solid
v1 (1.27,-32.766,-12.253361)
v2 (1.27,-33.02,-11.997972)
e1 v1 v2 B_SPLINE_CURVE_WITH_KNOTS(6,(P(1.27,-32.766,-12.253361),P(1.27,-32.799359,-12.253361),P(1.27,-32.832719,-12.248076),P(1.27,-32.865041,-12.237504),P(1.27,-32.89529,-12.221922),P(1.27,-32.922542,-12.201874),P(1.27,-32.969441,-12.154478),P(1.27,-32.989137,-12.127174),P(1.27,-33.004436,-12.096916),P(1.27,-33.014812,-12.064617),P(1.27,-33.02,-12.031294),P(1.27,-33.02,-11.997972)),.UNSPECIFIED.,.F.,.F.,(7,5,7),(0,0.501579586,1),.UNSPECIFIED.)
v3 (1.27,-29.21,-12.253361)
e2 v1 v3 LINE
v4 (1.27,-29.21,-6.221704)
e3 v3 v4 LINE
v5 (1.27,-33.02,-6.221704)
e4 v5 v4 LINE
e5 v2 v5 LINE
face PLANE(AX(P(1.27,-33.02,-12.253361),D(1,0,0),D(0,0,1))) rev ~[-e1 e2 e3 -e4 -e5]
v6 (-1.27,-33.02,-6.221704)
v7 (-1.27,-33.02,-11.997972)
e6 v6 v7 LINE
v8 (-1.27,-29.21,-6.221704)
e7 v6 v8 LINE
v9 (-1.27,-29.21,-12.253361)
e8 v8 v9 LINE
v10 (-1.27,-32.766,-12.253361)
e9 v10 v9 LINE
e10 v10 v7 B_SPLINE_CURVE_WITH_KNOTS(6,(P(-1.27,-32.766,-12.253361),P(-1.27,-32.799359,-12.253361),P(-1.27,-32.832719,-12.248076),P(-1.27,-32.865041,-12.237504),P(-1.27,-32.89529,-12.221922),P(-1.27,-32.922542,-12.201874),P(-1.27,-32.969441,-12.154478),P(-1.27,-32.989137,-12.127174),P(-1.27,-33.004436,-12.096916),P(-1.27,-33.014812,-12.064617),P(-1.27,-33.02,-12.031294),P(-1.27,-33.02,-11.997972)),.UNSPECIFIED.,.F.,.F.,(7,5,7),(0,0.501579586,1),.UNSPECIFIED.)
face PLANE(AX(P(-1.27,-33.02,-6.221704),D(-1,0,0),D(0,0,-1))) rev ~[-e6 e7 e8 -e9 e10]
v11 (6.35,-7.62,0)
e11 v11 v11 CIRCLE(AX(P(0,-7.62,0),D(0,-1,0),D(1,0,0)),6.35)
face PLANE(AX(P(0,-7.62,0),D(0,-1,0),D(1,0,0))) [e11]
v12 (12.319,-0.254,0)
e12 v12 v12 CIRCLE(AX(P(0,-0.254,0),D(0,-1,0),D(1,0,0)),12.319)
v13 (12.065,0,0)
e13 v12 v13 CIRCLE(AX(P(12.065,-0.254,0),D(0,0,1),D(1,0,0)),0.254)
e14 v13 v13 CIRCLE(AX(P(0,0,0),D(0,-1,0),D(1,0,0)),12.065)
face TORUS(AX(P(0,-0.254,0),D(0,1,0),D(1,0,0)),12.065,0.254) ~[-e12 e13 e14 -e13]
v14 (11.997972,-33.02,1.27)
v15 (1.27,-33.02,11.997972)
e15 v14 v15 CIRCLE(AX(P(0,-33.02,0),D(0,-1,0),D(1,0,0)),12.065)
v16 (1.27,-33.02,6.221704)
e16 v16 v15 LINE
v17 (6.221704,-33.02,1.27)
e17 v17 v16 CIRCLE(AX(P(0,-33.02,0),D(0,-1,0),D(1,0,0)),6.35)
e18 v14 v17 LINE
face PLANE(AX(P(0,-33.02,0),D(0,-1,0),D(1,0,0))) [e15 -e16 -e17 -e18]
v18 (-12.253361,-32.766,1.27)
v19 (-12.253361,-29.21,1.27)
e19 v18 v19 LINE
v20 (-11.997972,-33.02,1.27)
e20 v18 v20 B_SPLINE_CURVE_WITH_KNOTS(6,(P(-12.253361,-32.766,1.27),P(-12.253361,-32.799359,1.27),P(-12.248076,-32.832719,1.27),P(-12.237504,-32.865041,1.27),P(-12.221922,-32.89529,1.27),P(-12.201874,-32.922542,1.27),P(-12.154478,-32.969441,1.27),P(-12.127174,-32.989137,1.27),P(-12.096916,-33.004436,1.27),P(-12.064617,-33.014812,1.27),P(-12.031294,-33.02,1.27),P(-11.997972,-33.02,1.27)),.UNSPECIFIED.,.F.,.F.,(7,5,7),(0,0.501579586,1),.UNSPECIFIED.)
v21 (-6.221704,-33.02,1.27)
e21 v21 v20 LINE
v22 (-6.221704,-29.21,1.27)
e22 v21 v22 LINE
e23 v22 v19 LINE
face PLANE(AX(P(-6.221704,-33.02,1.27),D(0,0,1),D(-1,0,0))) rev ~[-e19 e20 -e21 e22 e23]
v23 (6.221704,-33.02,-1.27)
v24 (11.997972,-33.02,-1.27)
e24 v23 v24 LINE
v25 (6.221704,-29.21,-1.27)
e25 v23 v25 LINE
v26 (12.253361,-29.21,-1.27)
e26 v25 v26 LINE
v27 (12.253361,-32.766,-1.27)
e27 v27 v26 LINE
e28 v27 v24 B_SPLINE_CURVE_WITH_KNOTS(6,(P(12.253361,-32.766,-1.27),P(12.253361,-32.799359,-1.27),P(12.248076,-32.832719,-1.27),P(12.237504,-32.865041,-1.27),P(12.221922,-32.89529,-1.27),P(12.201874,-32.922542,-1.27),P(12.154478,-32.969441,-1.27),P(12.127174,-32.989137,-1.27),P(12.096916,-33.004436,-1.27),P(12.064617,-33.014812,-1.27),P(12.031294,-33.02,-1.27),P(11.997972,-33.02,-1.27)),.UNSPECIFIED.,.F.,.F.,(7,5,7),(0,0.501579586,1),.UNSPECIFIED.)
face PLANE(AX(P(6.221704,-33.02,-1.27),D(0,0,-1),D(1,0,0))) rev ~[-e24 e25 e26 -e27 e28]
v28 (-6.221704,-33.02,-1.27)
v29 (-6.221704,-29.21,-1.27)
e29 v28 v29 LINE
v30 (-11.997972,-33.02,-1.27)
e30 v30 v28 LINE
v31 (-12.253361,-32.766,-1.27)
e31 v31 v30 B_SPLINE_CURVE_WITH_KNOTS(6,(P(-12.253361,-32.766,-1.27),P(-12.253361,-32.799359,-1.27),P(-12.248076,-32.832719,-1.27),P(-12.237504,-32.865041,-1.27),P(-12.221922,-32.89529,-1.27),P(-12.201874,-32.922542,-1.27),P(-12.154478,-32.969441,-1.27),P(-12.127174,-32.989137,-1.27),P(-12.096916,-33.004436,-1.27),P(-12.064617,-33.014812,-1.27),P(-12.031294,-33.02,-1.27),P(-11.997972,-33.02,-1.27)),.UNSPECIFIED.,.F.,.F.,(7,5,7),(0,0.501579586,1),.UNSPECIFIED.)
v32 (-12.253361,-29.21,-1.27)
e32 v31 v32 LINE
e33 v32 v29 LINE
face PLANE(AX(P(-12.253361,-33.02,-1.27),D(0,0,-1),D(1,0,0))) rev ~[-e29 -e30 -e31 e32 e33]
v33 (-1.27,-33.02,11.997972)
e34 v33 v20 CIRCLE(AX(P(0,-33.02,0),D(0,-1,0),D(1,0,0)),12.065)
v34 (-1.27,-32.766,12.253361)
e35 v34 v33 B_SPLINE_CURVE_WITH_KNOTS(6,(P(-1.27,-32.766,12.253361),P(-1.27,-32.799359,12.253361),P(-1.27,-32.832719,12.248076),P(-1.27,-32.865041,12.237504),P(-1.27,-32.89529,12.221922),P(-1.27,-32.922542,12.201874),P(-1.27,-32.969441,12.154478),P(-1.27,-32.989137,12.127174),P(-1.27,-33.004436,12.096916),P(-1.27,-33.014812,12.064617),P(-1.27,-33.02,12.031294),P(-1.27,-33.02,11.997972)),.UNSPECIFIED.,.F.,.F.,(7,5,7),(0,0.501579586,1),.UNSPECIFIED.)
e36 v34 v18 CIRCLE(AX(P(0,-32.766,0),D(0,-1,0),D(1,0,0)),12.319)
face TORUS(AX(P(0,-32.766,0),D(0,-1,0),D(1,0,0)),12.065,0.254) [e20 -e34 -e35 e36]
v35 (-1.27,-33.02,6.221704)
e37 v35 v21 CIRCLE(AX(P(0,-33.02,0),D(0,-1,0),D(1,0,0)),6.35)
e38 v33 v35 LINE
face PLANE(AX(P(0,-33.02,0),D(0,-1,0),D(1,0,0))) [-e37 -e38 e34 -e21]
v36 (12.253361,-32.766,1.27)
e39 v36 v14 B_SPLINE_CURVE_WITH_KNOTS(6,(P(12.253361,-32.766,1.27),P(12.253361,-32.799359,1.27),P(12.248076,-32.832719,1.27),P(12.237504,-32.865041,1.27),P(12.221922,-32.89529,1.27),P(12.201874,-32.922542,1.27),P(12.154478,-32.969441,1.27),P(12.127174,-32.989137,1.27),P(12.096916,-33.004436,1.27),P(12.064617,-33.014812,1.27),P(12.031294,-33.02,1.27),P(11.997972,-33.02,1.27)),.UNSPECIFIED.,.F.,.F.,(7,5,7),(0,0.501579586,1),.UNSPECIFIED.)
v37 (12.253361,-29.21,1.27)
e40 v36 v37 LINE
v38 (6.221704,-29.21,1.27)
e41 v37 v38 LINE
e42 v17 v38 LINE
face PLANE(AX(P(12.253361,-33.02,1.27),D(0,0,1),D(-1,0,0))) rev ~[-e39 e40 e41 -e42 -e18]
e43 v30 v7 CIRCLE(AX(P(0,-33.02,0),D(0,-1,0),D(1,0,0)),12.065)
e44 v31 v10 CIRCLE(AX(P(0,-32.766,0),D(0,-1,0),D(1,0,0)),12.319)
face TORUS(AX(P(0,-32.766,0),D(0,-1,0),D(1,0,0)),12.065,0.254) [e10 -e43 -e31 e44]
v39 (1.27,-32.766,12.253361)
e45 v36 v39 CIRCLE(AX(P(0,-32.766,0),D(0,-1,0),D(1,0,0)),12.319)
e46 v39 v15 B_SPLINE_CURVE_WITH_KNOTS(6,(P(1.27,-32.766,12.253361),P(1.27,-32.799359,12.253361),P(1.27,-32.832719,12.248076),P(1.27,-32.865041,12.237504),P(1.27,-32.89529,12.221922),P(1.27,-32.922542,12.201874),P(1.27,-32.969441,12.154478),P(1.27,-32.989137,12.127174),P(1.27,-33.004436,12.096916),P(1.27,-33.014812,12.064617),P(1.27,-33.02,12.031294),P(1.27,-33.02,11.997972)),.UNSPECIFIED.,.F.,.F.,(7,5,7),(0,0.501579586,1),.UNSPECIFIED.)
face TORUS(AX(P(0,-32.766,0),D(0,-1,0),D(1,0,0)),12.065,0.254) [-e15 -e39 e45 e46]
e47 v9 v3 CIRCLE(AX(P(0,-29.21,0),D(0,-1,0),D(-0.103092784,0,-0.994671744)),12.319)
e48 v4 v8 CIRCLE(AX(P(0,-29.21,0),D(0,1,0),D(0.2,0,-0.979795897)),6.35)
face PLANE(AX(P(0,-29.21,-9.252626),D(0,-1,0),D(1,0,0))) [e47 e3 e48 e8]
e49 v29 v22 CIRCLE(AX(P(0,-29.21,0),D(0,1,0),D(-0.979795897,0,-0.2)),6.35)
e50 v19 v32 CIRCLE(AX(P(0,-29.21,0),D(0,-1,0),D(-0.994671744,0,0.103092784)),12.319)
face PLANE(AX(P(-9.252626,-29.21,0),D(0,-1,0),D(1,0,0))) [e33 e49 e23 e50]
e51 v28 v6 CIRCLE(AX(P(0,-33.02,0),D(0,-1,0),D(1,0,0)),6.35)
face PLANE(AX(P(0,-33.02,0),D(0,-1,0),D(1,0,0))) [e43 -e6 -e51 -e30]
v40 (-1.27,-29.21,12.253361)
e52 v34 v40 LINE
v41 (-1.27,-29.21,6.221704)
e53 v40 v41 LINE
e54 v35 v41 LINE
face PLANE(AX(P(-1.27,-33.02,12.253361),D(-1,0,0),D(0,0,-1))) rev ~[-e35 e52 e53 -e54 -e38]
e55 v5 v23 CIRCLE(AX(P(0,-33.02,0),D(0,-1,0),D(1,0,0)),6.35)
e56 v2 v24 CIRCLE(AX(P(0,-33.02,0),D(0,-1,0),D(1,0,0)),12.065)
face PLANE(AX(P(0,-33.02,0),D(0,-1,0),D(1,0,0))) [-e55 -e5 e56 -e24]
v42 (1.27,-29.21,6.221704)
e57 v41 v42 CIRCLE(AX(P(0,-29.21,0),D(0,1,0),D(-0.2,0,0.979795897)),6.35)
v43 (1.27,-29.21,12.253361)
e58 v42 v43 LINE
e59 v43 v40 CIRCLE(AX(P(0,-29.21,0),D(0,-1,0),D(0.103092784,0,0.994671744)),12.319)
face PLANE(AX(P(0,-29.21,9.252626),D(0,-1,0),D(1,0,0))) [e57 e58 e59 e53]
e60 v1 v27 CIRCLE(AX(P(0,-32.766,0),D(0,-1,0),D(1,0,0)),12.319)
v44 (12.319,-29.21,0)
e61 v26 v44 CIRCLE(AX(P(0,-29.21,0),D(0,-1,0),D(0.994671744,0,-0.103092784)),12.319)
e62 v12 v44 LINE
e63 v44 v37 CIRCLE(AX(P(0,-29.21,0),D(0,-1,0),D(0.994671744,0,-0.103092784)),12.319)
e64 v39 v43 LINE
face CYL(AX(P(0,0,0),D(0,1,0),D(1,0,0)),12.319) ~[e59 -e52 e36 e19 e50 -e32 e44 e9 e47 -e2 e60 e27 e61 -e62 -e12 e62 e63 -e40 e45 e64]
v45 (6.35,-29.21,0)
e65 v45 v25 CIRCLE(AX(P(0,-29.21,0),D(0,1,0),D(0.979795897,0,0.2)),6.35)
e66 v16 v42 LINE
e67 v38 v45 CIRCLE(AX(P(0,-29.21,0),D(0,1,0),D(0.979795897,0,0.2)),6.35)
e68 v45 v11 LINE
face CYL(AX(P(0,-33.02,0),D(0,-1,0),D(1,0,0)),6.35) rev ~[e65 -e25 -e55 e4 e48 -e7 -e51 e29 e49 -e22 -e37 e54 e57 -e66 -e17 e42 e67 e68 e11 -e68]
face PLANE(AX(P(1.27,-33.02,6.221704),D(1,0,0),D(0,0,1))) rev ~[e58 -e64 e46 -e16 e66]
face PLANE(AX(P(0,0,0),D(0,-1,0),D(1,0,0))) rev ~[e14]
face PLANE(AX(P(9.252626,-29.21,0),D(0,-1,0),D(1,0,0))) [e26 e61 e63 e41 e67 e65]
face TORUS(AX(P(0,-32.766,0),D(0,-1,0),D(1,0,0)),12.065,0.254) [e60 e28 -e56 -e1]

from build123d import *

# Parameters (mm, degrees)
F0_R     = 12.319
F1_DEPTH = 33.02
F3_R     = 6.35
F4_DEPTH = 25.4
F5_R     = 0.254
F7_DEPTH = 3.81


with BuildPart() as f1:
    # F0 (on Front) → F1 (new body)
    with BuildSketch(Plane.XZ):
        Circle(F0_R)
    extrude(amount=F1_DEPTH)

    # F3 (on face) → F4 (cut)
    with BuildSketch(Plane.XZ.offset(33.02)):
        Circle(F3_R)
    extrude(amount=-F4_DEPTH, mode=Mode.SUBTRACT)

    # F5
    f5_edges = [f1.edges().sort_by_distance(p)[0] for p in [
        (-12.319, -33.02, 0),
        (-12.319, 0, 0),
    ]]
    fillet(f5_edges, radius=F5_R)

    # F6 (on face) → F7 (cut)
    with BuildSketch(Plane.XZ.offset(33.02)):
        with BuildLine():
            ThreePointArc((-1.27, 6.2217039467), (0, 6.35), (1.27, 6.2217039467))
            Line((1.27, 6.2217039467), (1.27, 12.2533612123))
            ThreePointArc((1.27, 12.2533612123), (0, 12.319), (-1.27, 12.2533612123))
            Line((-1.27, 12.2533612123), (-1.27, 6.2217039467))
        make_face()
        with BuildLine():
            Line((-6.2217039467, 1.27), (-12.2533612123, 1.27))
            ThreePointArc((-12.2533612123, 1.27), (-12.319, 0), (-12.2533612123, -1.27))
            Line((-12.2533612123, -1.27), (-6.2217039467, -1.27))
            ThreePointArc((-6.2217039467, -1.27), (-6.35, 0), (-6.2217039467, 1.27))
        make_face()
        with BuildLine():
            Line((-1.27, -6.2217039467), (-1.27, -12.2533612123))
            ThreePointArc((-1.27, -12.2533612123), (0, -12.319), (1.27, -12.2533612123))
            Line((1.27, -12.2533612123), (1.27, -6.2217039467))
            ThreePointArc((1.27, -6.2217039467), (0, -6.35), (-1.27, -6.2217039467))
        make_face()
        with BuildLine():
            Line((6.2217039467, -1.27), (12.2533612123, -1.27))
            ThreePointArc((12.2533612123, -1.27), (12.319, 0), (12.2533612123, 1.27))
            Line((12.2533612123, 1.27), (6.2217039467, 1.27))
            ThreePointArc((6.2217039467, 1.27), (6.35, 0), (6.2217039467, -1.27))
        make_face()
    extrude(amount=-F7_DEPTH, mode=Mode.SUBTRACT)


solid = f1.part
